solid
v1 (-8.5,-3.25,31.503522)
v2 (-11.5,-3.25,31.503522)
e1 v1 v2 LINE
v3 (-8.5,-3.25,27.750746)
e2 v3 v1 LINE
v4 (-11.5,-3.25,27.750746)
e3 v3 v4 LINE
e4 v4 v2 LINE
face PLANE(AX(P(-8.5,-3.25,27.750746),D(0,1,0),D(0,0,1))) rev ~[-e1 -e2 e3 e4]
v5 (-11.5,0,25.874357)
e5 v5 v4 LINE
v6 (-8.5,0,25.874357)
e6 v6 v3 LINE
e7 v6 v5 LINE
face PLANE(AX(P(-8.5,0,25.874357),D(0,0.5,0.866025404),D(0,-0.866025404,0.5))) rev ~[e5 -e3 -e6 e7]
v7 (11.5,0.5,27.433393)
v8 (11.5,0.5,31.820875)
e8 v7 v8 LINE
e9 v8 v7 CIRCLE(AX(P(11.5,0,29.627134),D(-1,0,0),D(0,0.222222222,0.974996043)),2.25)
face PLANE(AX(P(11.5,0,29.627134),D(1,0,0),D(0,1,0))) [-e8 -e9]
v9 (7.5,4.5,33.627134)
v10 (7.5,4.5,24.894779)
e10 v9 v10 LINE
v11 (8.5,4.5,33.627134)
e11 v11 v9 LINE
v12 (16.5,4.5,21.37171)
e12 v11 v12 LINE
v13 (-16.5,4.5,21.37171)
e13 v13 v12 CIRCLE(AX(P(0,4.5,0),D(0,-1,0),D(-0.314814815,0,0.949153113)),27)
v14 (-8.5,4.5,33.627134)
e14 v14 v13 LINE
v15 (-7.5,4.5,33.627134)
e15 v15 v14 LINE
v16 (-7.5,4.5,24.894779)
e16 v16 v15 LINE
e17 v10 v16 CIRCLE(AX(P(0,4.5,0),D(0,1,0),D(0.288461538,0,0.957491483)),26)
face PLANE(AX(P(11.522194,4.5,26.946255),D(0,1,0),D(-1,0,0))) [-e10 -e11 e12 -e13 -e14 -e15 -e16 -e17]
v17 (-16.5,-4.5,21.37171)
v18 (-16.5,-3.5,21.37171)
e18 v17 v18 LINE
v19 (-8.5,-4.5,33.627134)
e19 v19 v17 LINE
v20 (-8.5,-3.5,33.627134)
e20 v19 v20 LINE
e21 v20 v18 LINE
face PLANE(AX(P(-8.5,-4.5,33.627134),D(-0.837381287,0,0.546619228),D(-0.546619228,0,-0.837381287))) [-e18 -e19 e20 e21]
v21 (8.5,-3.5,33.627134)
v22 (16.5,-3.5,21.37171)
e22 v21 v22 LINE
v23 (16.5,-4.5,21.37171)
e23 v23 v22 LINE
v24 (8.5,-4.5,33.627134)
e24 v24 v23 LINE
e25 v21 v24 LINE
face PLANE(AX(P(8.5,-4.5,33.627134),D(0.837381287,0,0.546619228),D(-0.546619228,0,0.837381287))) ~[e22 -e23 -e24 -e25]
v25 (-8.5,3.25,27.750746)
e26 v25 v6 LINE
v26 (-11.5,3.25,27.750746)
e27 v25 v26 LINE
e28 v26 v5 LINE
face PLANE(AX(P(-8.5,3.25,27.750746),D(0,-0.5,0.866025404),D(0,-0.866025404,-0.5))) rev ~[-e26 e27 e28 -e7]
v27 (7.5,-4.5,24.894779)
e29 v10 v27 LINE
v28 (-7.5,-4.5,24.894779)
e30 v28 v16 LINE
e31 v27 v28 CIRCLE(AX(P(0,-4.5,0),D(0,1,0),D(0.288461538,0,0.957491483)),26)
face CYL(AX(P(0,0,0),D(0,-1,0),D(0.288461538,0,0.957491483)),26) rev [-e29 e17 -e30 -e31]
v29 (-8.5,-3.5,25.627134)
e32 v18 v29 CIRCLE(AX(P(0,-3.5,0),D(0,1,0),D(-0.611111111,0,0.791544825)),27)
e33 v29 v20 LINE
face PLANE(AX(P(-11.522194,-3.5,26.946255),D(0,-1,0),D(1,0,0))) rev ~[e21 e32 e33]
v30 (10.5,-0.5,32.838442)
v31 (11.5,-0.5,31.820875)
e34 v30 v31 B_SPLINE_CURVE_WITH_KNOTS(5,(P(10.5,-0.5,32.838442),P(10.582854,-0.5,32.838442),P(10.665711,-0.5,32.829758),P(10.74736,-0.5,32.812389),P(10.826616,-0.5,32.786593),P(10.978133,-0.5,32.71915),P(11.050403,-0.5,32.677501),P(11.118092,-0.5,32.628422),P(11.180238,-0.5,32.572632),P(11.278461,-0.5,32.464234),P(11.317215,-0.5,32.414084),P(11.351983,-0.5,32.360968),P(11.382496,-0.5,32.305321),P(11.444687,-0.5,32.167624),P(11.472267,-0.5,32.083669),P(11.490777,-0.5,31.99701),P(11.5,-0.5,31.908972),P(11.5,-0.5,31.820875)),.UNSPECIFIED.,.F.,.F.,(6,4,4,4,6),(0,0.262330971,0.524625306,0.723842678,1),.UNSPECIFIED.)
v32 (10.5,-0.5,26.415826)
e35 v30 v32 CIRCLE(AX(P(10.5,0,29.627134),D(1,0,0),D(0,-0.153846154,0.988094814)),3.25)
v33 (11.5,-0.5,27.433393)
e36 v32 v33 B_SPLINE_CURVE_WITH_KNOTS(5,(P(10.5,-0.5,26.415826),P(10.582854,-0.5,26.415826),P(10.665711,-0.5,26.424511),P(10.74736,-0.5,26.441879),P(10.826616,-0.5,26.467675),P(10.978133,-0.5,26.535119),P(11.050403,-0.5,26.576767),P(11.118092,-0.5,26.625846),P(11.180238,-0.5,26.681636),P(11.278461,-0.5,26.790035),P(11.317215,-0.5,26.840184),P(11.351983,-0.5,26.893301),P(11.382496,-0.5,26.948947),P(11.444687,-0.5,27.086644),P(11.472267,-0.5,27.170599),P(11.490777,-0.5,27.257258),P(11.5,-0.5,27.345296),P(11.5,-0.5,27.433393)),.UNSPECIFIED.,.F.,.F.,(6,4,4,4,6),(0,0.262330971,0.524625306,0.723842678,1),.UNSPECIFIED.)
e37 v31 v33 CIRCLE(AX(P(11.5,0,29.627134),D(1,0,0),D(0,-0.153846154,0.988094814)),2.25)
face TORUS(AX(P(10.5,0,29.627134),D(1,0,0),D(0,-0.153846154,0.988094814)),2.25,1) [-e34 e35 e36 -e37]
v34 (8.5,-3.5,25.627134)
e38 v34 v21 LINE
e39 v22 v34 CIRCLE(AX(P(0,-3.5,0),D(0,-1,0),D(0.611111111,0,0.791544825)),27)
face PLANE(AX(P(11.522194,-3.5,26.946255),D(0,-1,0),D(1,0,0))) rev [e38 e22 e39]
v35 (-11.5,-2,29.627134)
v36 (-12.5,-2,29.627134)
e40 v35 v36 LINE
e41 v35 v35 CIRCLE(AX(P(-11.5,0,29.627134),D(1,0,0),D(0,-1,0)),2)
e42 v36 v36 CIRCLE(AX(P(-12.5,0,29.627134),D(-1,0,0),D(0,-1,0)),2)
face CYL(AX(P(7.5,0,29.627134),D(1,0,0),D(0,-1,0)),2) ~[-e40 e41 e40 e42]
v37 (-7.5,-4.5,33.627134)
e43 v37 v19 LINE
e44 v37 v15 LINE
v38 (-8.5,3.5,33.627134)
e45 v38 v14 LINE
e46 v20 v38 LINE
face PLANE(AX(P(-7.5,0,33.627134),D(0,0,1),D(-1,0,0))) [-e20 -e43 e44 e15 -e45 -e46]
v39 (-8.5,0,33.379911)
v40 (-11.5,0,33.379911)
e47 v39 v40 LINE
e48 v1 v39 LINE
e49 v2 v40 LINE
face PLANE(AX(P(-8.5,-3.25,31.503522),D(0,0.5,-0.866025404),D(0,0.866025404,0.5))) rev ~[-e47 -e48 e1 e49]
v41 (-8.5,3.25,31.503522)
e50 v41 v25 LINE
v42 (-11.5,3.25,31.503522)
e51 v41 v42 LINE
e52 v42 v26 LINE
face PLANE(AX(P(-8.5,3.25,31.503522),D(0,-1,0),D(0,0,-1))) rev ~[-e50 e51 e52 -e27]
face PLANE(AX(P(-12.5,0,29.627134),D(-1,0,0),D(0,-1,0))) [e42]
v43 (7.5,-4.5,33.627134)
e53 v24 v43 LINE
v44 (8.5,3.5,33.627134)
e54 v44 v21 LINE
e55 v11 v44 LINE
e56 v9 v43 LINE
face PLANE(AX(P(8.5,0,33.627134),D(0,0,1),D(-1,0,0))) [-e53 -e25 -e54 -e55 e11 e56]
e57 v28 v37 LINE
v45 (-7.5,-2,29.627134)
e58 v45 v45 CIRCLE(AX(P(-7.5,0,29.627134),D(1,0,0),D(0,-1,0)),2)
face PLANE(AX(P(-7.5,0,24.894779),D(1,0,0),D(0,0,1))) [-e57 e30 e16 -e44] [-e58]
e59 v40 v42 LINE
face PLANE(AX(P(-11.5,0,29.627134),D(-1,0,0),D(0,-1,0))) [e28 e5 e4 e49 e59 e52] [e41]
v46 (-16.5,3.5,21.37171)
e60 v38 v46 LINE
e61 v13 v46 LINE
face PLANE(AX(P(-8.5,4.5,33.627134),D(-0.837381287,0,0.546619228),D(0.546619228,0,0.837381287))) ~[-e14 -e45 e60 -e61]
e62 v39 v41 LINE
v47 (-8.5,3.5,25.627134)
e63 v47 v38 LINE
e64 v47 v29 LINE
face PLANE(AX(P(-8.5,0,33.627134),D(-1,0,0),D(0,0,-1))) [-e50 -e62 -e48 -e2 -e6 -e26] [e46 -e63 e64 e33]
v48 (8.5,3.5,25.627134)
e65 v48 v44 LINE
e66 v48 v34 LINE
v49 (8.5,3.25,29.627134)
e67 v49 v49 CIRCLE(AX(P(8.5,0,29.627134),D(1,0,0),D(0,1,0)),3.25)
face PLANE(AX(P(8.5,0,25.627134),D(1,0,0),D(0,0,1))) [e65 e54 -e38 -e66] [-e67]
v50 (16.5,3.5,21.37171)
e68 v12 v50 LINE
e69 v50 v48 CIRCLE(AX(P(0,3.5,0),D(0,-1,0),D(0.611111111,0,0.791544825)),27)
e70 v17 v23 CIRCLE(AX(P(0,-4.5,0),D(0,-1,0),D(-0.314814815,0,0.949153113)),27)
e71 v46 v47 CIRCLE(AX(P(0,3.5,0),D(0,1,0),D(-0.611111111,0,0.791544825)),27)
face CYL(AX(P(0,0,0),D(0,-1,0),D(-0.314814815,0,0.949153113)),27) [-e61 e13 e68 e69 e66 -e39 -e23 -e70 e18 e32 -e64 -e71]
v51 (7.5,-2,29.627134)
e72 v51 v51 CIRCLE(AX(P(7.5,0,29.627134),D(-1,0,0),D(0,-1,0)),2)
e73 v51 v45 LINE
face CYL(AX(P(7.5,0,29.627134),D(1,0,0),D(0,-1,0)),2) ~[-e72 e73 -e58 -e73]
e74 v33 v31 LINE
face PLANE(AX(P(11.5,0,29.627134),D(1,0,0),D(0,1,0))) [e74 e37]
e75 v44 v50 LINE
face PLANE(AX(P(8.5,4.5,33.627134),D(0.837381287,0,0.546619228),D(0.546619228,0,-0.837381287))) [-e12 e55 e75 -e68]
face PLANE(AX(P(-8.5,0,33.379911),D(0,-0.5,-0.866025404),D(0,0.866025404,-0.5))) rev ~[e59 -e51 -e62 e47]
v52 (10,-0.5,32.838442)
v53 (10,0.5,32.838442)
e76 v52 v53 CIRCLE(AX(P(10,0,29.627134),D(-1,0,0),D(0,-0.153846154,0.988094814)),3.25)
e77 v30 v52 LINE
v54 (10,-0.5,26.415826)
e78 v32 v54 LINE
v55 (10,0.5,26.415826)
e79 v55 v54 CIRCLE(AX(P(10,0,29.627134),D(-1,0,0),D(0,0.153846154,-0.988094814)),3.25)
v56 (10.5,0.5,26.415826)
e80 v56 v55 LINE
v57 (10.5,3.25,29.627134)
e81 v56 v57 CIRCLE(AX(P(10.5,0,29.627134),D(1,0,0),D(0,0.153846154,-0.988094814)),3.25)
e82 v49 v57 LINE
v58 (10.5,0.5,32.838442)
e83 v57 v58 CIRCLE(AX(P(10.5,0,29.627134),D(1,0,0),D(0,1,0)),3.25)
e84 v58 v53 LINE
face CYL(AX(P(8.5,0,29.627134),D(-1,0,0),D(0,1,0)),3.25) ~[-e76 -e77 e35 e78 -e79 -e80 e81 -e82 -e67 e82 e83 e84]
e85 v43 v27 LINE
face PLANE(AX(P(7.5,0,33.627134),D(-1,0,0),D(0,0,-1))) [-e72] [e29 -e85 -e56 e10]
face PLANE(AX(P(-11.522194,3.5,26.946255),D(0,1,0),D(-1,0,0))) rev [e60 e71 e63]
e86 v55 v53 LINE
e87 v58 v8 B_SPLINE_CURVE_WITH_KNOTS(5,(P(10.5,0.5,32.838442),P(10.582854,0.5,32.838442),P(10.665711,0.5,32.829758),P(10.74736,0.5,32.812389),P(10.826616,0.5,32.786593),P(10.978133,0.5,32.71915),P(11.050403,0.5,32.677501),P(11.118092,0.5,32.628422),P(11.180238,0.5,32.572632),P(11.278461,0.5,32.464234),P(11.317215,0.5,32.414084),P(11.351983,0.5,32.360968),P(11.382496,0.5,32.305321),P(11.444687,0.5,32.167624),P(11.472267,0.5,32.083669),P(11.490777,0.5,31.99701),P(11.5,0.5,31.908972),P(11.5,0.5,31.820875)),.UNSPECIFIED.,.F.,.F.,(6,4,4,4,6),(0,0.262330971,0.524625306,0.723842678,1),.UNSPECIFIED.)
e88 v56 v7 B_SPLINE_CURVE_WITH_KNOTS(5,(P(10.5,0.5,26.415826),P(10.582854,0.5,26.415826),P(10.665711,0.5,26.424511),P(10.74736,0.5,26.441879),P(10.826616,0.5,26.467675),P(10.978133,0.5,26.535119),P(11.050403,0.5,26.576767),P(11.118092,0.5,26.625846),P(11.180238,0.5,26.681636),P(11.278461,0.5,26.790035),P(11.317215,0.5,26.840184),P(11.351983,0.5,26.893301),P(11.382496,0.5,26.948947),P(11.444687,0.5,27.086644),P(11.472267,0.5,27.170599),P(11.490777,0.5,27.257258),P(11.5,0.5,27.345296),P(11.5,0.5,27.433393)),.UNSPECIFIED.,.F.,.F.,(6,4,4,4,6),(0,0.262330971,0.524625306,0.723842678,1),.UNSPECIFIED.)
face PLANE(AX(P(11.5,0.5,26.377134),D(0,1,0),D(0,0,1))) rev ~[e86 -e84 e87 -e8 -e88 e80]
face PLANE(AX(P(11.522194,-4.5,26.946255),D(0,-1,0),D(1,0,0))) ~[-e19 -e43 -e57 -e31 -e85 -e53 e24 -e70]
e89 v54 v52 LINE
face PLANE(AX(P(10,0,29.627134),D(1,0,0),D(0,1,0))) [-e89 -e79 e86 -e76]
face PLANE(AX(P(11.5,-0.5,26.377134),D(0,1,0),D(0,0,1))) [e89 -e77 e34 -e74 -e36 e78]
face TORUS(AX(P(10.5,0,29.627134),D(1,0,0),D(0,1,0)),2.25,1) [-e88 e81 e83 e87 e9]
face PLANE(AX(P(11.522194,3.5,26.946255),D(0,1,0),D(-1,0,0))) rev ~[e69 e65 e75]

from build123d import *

# Parameters (mm, degrees)
F1_DEPTH         = 4.5
F3_DEPTH         = 1
F3_COPIES2_COUNT = 2
F5_DEPTH         = 3
F6_R             = 3.25
F7_DEPTH         = 3
F8_R             = 2
F9_DEPTH         = 20
F10_W            = 1
F10_H            = 6.5
F11_DEPTH        = 1.5
F12_R            = 1


# Not quite as in the source:
# - a pattern or mirror of a feature is missing from the dataset's text; its kind, count and spacing are read off the source's solid


with BuildPart() as f1:
    # F0 (on Front) → F1 (new body, symmetric)
    with BuildSketch(Plane.XZ):
        with BuildLine():
            Line((-8.5, 33.6271340575), (-8.5, 25.6271340575))
            ThreePointArc((-8.5, 25.6271340575), (0, -27), (8.5, 25.6271340575))
            Line((8.5, 25.6271340575), (8.5, 33.6271340575))
            Line((8.5, 33.6271340575), (7.5, 33.6271340575))
            Line((7.5, 33.6271340575), (7.5, 24.894778569))
            ThreePointArc((7.5, 24.894778569), (0, -26), (-7.5, 24.894778569))
            Line((-7.5, 24.894778569), (-7.5, 33.6271340575))
            Line((-7.5, 33.6271340575), (-8.5, 33.6271340575))
        make_face()
    extrude(amount=F1_DEPTH, both=True)

    # F2 (on face) → F3 (join)
    with BuildSketch(Plane.XZ.offset(4.5)):
        with BuildLine():
            Line((-8.5, 25.6271340575), (-8.5, 33.6271340575))
            Line((-8.5, 33.6271340575), (-16.5, 21.3717102732))
            ThreePointArc((-16.5, 21.3717102732), (-12.6797932907, 23.8374252407), (-8.5, 25.6271340575))
        make_face()
    f3 = extrude(amount=-F3_DEPTH)

    # F3_copies: F3 across plane
    add(f3.mirror(Plane.ZX))

    # F3_copies1: F3 across plane
    add(f3.mirror(Plane(origin=(0, 0, 0), x_dir=(0, 0, 1), z_dir=(1, 0, 0))))

    # F3_copies2: F3 ×2 about axis
    f3_copies2_axis = Axis((0, 0, 0), (0, 0, 1))
    for i in range(1, F3_COPIES2_COUNT):
        add(f3.rotate(f3_copies2_axis, i * 360 / F3_COPIES2_COUNT))

    # F4 (on face) → F5 (join)
    with BuildSketch(Plane(origin=(-8.5, 0, 0), x_dir=(0, -1, 0), z_dir=(-1, 0, 0))):
        Polygon((-3.25, 31.5035224323), (-3.25, 27.7507456826), (0, 25.8743573077), (3.25, 27.7507456826), (3.25, 31.5035224323), (0, 33.3799108072), align=None)
    extrude(amount=F5_DEPTH)

    # F6 (on face) → F7 (join)
    with BuildSketch(Plane.YZ.offset(8.5)):
        with Locations((0, 29.6271340575)):
            Circle(F6_R)
    extrude(amount=F7_DEPTH)

    # F8 (on face) → F9 (join)
    with BuildSketch(Plane(origin=(7.5, 0, 0), x_dir=(0, -1, 0), z_dir=(-1, 0, 0))):
        with Locations((0, 29.6271340575)):
            Circle(F8_R)
    extrude(amount=F9_DEPTH)

    # F10 (on face) → F11 (cut)
    with BuildSketch(Plane.YZ.offset(11.5)):
        with Locations((0, 29.6271340575)):
            Rectangle(F10_W, F10_H)
    extrude(amount=-F11_DEPTH, mode=Mode.SUBTRACT)

    # F12
    f12_edges = [f1.edges().sort_by_distance(p)[0] for p in [
        (11.5, -3.25, 29.627134),
        (11.5, 2.468552, 31.741076),
        (11.5, 2.468552, 27.513192),
    ]]
    fillet(f12_edges, radius=F12_R)


solid = f1.part
